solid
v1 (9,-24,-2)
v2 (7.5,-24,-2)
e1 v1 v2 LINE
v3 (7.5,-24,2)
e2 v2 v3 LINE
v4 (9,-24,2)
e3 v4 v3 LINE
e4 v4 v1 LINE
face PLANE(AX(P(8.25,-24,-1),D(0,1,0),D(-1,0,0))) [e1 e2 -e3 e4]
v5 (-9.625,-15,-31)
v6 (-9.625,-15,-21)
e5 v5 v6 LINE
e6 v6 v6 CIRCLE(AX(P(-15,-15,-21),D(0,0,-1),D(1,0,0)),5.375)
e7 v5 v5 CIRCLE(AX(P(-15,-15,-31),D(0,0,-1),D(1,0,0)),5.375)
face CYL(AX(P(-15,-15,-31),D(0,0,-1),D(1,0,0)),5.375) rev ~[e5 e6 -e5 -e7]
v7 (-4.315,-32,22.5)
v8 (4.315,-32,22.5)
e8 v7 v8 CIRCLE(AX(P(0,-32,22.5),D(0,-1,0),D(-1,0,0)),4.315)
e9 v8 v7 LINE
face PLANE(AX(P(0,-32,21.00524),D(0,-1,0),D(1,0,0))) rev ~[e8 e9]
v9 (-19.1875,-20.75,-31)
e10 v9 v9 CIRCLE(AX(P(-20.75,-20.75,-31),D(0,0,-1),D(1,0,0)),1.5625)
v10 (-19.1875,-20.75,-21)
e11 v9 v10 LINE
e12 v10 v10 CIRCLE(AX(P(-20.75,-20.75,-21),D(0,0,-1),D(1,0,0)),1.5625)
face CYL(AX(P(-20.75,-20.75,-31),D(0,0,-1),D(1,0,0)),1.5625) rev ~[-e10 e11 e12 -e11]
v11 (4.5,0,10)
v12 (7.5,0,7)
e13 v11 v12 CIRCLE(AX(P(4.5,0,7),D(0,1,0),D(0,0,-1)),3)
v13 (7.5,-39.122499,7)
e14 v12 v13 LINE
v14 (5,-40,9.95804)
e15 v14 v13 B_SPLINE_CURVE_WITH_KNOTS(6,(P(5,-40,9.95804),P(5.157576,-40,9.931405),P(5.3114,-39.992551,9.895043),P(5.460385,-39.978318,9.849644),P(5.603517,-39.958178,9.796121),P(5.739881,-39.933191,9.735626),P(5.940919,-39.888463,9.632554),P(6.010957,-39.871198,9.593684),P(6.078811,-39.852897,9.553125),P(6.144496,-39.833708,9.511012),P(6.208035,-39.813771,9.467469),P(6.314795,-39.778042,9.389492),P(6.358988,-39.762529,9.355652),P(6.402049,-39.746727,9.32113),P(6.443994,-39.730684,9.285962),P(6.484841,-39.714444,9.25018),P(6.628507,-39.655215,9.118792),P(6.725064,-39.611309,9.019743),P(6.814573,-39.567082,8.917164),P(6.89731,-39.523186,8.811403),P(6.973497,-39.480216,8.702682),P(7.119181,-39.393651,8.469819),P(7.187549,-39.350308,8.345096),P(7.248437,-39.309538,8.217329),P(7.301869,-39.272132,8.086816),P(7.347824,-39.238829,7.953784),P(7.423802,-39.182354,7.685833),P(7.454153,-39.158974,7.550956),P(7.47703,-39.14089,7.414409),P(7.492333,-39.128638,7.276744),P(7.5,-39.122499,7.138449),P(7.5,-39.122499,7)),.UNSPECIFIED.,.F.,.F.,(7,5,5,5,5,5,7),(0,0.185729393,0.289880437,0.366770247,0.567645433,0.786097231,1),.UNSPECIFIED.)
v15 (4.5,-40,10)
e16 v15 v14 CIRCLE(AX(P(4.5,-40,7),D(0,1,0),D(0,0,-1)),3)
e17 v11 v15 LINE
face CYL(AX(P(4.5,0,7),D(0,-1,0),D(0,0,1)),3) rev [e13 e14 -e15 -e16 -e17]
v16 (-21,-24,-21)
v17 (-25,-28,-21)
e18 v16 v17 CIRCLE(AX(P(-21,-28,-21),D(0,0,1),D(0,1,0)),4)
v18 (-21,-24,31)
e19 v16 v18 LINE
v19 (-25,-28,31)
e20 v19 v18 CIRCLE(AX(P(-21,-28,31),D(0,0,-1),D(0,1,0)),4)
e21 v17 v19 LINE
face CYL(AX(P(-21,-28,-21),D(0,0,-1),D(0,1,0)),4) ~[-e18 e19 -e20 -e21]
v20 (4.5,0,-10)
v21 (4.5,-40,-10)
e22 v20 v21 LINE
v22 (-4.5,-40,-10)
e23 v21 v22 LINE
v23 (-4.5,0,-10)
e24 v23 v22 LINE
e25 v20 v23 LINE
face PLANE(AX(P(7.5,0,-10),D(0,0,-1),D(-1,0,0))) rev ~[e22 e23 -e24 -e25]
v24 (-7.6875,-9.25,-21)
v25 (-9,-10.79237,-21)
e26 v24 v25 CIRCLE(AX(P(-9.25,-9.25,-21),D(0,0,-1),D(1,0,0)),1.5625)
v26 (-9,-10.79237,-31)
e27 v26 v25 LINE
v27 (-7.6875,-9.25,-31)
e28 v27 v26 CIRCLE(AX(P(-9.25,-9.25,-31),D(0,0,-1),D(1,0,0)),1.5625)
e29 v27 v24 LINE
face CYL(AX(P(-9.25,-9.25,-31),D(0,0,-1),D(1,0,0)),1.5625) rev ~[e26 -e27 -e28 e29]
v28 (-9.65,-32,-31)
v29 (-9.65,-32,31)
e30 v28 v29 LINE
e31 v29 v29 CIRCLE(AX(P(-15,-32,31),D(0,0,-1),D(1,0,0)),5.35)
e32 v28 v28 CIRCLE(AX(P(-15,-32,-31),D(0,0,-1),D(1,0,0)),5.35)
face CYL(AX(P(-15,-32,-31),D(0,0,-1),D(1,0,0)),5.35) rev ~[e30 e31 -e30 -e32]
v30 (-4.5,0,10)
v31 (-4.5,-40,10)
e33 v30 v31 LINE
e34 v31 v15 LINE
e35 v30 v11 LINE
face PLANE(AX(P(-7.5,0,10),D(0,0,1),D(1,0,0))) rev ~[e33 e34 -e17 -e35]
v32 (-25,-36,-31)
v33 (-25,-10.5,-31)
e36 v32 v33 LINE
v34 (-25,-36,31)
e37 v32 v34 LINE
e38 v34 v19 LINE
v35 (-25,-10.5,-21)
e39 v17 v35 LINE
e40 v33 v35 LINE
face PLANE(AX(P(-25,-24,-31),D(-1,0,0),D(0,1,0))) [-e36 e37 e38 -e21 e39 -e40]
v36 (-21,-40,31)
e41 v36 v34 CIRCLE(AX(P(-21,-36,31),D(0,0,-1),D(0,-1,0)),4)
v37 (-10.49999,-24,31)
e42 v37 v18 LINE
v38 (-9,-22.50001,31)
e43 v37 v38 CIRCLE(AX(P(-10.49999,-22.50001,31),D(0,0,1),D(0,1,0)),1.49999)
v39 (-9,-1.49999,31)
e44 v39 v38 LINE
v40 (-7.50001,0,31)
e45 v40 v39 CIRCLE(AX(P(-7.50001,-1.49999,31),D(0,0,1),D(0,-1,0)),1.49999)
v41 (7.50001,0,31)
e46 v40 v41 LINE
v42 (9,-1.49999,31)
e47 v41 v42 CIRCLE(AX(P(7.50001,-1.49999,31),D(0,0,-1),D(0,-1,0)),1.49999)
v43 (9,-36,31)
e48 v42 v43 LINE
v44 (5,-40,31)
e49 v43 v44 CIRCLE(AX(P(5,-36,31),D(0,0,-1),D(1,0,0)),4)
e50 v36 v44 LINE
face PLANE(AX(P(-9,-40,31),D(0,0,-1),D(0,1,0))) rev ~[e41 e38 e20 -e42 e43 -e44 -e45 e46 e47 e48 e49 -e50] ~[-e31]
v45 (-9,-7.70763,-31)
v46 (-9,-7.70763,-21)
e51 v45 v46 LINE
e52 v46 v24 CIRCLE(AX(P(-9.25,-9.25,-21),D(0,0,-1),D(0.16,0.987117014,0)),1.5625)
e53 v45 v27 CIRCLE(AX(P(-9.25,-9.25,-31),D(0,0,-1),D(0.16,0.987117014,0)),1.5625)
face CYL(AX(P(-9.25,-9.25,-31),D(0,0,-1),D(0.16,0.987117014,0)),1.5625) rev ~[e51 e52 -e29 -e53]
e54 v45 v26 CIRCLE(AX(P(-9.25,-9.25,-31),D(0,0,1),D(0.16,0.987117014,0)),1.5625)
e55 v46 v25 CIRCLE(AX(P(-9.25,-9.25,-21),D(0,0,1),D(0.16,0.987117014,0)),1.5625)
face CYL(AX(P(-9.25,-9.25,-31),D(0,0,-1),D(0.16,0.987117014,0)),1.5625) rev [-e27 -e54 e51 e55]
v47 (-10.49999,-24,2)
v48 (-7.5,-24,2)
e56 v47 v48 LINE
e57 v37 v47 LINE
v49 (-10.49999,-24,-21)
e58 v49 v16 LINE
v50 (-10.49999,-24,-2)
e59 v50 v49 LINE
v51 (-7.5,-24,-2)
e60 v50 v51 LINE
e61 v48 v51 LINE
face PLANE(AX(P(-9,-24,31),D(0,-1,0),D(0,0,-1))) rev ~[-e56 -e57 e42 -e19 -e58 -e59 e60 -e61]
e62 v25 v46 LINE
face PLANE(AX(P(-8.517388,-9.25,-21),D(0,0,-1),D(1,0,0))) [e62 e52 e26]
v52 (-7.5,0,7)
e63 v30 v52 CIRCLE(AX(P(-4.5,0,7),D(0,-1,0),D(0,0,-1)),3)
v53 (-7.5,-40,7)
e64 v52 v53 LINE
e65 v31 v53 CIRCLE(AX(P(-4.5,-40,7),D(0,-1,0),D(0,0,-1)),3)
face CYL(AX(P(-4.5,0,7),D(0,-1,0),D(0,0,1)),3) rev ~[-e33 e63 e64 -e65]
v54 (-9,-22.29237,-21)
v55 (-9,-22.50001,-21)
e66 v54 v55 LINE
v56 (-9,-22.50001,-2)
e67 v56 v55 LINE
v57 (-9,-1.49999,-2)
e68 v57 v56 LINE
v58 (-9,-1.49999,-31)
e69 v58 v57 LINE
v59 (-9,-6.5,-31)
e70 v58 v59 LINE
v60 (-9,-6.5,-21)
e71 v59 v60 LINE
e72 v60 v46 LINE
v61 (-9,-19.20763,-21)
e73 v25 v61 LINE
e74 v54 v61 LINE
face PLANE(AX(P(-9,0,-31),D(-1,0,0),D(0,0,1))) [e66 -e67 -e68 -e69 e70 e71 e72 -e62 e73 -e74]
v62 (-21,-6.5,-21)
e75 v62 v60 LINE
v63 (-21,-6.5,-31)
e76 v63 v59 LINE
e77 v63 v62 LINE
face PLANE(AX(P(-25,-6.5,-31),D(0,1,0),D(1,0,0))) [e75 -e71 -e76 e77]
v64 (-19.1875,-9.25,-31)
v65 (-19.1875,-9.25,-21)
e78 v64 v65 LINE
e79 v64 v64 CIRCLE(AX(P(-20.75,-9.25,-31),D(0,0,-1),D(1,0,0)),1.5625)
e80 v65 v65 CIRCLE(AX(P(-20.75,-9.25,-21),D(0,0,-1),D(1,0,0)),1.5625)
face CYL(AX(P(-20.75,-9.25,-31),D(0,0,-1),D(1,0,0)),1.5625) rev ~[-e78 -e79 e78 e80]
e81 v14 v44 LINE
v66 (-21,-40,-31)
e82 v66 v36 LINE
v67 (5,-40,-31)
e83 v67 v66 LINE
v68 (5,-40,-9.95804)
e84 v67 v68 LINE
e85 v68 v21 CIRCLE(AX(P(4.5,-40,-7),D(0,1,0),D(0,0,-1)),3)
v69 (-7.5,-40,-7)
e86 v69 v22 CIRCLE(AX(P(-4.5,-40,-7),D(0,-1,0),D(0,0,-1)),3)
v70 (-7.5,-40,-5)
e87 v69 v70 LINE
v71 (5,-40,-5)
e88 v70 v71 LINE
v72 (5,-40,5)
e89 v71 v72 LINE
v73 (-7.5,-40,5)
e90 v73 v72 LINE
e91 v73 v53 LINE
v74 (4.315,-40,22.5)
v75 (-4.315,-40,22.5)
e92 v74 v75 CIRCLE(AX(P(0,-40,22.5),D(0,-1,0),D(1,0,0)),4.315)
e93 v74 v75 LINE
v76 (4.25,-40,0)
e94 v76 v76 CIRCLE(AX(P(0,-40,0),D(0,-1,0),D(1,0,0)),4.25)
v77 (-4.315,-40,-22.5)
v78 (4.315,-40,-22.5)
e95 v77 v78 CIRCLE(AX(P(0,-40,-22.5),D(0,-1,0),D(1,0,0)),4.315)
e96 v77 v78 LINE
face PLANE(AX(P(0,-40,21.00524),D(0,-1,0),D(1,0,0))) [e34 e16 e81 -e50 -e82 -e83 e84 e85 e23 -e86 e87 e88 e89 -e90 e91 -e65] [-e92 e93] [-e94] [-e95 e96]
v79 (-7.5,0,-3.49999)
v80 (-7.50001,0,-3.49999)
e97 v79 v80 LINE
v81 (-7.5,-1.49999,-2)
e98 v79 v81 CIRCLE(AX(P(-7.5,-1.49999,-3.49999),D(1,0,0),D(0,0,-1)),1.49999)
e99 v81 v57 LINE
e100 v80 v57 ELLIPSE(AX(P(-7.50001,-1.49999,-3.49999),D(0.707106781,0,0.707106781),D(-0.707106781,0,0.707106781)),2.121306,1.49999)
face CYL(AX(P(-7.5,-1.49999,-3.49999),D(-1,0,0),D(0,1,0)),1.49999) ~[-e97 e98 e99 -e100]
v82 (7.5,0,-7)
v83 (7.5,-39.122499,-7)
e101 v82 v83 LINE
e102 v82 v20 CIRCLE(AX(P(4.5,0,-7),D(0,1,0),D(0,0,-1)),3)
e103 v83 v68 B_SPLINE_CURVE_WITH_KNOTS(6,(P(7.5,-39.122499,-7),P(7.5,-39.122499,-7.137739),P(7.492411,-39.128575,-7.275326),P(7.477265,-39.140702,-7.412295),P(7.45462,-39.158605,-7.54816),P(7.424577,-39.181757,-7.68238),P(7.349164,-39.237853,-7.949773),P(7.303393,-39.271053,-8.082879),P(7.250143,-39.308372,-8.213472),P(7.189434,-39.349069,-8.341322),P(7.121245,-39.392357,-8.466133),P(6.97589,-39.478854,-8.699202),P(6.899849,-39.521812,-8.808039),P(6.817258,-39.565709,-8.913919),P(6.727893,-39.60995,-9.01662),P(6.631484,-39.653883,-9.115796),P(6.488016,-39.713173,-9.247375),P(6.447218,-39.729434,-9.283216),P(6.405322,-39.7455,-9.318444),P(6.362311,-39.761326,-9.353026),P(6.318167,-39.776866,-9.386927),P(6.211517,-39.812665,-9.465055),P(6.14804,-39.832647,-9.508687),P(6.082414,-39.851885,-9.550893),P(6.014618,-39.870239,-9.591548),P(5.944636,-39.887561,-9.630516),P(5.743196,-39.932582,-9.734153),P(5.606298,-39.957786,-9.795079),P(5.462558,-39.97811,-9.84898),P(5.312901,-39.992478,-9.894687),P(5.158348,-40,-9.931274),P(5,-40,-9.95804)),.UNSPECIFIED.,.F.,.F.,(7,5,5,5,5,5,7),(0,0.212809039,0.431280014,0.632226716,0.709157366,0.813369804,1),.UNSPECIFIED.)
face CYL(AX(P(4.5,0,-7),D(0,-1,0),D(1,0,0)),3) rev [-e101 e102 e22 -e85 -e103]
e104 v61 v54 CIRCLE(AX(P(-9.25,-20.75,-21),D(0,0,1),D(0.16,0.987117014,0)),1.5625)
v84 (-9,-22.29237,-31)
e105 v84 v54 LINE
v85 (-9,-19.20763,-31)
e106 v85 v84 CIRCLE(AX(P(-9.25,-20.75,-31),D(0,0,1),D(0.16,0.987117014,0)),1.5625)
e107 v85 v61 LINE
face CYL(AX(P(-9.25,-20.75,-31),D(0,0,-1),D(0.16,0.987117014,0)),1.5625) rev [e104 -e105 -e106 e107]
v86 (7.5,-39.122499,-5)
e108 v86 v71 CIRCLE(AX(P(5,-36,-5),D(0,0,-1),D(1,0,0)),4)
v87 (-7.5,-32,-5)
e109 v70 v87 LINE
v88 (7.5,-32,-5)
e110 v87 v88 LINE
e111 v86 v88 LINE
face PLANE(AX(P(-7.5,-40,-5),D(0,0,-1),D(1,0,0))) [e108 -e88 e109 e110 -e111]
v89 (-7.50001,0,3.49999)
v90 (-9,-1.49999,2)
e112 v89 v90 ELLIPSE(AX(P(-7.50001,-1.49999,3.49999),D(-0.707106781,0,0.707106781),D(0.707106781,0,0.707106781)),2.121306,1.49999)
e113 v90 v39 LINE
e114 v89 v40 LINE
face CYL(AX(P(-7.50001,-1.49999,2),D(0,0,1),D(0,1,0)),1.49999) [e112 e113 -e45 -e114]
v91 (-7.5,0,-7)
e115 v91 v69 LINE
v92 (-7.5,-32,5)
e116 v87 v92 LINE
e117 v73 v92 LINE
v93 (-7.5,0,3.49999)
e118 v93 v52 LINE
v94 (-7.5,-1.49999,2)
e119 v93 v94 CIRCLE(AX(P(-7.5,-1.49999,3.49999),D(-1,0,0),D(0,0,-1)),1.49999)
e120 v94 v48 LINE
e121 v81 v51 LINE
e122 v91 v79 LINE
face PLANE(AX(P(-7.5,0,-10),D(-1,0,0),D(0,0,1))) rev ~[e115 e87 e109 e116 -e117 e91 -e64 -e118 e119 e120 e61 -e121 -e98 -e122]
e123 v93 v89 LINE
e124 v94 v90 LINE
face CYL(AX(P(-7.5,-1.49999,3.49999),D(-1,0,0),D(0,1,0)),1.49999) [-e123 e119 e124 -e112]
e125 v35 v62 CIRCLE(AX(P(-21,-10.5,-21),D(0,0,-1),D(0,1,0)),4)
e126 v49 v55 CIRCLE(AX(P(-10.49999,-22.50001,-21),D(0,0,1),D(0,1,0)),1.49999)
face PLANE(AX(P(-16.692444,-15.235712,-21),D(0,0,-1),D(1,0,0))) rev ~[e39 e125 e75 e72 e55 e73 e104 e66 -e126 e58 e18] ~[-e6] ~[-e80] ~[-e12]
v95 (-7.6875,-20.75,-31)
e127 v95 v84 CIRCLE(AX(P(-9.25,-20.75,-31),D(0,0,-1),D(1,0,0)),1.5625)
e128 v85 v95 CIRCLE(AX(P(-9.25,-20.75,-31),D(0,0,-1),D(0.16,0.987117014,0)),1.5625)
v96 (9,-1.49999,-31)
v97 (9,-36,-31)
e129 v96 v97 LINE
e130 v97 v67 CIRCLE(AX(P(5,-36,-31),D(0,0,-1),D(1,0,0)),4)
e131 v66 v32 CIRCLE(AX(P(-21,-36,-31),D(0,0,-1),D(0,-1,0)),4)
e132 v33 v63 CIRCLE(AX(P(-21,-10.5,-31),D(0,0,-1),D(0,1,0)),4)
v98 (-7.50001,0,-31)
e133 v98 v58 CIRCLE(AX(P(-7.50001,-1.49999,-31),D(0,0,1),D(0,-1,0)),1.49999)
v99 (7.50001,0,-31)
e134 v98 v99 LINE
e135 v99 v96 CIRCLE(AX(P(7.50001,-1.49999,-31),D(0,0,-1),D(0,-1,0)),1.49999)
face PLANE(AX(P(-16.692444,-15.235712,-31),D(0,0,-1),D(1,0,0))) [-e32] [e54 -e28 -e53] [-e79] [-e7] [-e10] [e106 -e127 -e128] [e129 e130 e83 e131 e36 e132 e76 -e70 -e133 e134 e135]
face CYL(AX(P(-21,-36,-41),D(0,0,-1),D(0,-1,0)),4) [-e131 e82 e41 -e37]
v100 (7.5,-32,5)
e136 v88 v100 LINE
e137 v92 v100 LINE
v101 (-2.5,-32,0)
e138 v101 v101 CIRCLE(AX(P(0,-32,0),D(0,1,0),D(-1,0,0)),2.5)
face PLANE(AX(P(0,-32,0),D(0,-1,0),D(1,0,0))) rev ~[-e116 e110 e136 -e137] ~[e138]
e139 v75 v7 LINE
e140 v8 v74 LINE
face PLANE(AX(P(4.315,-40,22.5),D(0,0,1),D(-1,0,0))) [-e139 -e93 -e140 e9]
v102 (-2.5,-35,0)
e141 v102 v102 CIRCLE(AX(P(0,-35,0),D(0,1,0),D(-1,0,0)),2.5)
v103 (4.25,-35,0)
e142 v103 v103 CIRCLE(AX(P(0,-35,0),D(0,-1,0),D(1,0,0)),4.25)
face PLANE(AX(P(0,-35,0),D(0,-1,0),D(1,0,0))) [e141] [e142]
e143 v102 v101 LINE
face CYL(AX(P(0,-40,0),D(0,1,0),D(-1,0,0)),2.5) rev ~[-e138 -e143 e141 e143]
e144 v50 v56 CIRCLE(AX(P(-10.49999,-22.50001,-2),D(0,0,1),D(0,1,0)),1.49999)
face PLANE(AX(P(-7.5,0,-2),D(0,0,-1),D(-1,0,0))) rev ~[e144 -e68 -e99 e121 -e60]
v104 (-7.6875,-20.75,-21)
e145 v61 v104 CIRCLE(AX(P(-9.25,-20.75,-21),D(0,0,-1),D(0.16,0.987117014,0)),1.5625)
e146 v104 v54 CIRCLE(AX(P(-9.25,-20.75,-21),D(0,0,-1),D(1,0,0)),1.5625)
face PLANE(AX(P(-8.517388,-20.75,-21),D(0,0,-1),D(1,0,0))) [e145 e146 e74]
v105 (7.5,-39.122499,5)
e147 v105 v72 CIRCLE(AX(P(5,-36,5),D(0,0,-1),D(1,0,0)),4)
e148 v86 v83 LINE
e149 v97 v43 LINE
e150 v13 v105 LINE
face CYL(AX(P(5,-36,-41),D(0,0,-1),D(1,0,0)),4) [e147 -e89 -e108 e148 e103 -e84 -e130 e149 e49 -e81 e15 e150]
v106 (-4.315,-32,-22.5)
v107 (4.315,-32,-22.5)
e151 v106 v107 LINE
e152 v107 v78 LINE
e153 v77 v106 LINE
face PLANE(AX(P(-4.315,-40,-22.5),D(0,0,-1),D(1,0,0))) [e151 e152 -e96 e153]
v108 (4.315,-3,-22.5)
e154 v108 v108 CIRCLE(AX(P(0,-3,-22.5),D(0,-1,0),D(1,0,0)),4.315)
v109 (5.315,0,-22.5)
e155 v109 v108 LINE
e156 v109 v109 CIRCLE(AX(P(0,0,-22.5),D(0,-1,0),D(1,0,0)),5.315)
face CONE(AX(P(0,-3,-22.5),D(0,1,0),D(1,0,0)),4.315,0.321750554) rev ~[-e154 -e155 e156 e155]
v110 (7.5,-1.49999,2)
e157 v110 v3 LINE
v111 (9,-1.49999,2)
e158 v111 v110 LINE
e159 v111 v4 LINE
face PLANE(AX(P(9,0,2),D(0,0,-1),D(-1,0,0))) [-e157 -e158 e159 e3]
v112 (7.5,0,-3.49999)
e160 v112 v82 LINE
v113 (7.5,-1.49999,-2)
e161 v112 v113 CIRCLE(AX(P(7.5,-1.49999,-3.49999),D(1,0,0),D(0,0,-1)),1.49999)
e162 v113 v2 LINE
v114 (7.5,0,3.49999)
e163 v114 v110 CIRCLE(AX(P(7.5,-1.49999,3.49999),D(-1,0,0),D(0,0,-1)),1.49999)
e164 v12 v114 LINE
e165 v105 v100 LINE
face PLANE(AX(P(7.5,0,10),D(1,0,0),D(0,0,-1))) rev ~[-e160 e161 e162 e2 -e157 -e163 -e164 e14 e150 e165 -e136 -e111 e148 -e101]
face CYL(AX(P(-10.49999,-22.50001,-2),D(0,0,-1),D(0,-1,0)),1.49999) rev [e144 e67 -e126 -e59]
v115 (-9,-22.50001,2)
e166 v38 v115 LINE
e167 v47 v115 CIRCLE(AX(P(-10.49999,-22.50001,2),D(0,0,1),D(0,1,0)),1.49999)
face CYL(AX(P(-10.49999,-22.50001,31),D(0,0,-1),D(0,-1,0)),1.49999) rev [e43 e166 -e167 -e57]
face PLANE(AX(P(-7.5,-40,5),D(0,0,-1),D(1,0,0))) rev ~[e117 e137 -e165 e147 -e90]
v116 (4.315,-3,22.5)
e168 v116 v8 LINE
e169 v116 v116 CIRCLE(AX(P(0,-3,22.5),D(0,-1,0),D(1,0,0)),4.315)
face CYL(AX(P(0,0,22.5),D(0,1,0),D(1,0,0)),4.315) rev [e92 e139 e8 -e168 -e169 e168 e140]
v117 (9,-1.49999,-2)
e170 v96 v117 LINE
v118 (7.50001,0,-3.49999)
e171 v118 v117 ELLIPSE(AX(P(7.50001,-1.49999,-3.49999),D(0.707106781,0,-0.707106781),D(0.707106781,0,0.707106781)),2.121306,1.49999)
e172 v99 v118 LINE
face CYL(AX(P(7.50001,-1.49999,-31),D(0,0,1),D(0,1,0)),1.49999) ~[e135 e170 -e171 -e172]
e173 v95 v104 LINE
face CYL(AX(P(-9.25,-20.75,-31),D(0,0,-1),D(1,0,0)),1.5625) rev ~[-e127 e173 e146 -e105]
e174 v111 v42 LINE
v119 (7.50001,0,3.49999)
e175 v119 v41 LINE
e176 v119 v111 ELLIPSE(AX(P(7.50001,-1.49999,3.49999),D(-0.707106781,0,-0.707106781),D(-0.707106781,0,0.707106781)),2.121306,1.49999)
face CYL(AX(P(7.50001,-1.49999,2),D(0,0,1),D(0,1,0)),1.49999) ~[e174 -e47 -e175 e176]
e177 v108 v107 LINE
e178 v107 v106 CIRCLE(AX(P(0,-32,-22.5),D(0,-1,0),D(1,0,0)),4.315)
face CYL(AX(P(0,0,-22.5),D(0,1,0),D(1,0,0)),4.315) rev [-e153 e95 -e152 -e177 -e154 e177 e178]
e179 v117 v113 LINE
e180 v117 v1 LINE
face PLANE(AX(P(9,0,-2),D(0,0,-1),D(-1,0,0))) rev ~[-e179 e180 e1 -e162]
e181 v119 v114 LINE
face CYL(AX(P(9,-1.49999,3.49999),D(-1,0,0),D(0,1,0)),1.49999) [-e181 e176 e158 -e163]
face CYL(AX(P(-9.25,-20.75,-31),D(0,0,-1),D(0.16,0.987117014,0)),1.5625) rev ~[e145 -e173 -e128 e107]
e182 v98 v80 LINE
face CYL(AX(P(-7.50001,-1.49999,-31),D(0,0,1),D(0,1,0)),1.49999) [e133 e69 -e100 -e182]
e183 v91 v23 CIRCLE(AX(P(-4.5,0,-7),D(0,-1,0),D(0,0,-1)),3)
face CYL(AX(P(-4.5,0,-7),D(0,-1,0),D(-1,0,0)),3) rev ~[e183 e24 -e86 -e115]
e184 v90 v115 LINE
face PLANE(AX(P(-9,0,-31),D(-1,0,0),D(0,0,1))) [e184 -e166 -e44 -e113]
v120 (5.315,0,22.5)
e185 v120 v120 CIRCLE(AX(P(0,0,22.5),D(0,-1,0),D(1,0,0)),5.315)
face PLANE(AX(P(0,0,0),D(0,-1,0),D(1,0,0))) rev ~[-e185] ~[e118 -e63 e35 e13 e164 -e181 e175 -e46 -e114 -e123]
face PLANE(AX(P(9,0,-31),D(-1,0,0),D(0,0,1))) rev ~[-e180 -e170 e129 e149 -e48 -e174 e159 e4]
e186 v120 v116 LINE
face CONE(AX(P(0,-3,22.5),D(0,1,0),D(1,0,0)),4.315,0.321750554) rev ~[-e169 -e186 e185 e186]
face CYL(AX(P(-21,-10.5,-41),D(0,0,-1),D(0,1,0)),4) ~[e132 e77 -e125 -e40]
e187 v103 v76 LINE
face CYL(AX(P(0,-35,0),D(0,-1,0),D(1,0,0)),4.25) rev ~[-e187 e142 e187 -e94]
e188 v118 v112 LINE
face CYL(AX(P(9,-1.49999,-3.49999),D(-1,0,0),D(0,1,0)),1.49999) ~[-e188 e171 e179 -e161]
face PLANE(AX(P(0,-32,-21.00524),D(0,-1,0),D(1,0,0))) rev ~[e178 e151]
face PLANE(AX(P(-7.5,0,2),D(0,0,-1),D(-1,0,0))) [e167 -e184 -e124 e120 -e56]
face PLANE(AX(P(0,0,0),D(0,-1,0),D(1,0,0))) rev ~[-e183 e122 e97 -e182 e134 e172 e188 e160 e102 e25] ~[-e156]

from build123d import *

# Parameters (mm, degrees)
F0_W            = 18
F0_H            = 62
F0_R            = 4.315
F1_DEPTH        = 40
F3_DEPTH        = 16
F4_R            = 5.35
F5_DEPTH        = 100
F6_R            = 1.5625
F6_R_2          = 5.375
F7_DEPTH        = 10
F8_DEPTH        = 10
F10_DEPTH       = 100
F9_W            = 1.5
F9_H            = 2
F11_DEPTH       = 24
F12_W           = 15
F12_H           = 10
F13_DEPTH       = 8
F14_SIZE2       = 3
F14_SIZE        = 1
F14_2_SIZE2     = 3
F14_2_SIZE      = 1
F15_R           = 3
F16_T1_DEPTH    = 62
F16_T3_DEPTH    = 82
F16_T5_DEPTH    = 30
F17_R           = 1.49999
F18_D           = 5
F18_DEPTH       = 10
F18_CBORE_D     = 8.5
F18_CBORE_DEPTH = 5
F18_TIP         = 1.5021515476


# Not quite as in the source:
# - a fillet or chamfer that OpenCascade refuses, or shapes differently, is made with other operations: its cross-section is extruded or revolved along the edge and cut away or added
# - a fillet or chamfer is up to 0.001 mm smaller than in the source, because OpenCascade refuses the exact size


with BuildPart() as f1:
    # F0 (on Front) → F1 (new body)
    with BuildSketch(Plane.XZ):
        Rectangle(F0_W, F0_H)
        with Locations((0, -22.5)):
            Circle(F0_R, mode=Mode.SUBTRACT)
        with Locations((0, 22.5)):
            Circle(F0_R, mode=Mode.SUBTRACT)
    extrude(amount=F1_DEPTH)

    # F2 (on face) → F3 (join)
    with BuildSketch(Plane(origin=(-9, 0, 0), x_dir=(0, -1, 0), z_dir=(-1, 0, 0))):
        Polygon((24, 31), (24, 0), (24, -31), (40, -31), (40, 31), align=None)
    extrude(amount=F3_DEPTH)

    # F4 (on face) → F5 (cut)
    with BuildSketch(Plane(origin=(0, 0, -31), x_dir=(1, 0, 0), z_dir=(0, 0, -1))):
        with Locations((-15, 32)):
            Circle(F4_R)
    extrude(amount=-F5_DEPTH, mode=Mode.SUBTRACT)

    # F6 (on face) → F7 (join)
    with BuildSketch(Plane(origin=(0, 0, -31), x_dir=(1, 0, 0), z_dir=(0, 0, -1))):
        with BuildLine():
            Line((-9, 22.2923703349), (-9, 24))
            Line((-9, 24), (-25, 24))
            Line((-25, 24), (-25, 6.5))
            Line((-25, 6.5), (-9, 6.5))
            Line((-9, 6.5), (-9, 7.7076296651))
            ThreePointArc((-9, 7.7076296651), (-10.8125, 9.25), (-9, 10.7923703349))
            Line((-9, 10.7923703349), (-9, 19.2076296651))
            ThreePointArc((-9, 19.2076296651), (-10.8125, 20.75), (-9, 22.2923703349))
        make_face()
        with Locations((-20.75, 9.25)):
            Circle(F6_R, mode=Mode.SUBTRACT)
        with Locations((-15, 15)):
            Circle(F6_R_2, mode=Mode.SUBTRACT)
        with Locations((-20.75, 20.75)):
            Circle(F6_R, mode=Mode.SUBTRACT)
    extrude(amount=-F7_DEPTH)

    # F6 (on face) → F8 (cut)
    with BuildSketch(Plane(origin=(0, 0, -31), x_dir=(1, 0, 0), z_dir=(0, 0, -1))):
        with BuildLine():
            ThreePointArc((-7.6875, 20.75), (-8.0600354522, 21.7626157341), (-9, 22.2923703349))
            Line((-9, 22.2923703349), (-9, 19.2076296651))
            ThreePointArc((-9, 19.2076296651), (-8.0600354522, 19.7373842659), (-7.6875, 20.75))
        make_face()
        with BuildLine():
            ThreePointArc((-7.6875, 9.25), (-8.0600354522, 10.2626157341), (-9, 10.7923703349))
            Line((-9, 10.7923703349), (-9, 7.7076296651))
            ThreePointArc((-9, 7.7076296651), (-8.0600354522, 8.2373842659), (-7.6875, 9.25))
        make_face()
    extrude(amount=-F8_DEPTH, mode=Mode.SUBTRACT)

    # F9 (on face) → F10 (cut)
    with BuildSketch(Plane(origin=(0, 0, 0), x_dir=(-1, 0, 0), z_dir=(0, 1, 0))):
        Polygon((7.5, 2), (7.5, 10), (-7.5, 10), (-7.5, 2), (-7.5, 0), (0, 0), (7.5, 0), align=None)
        Polygon((7.5, -2), (7.5, 0), (0, 0), (-7.5, 0), (-7.5, -2), (-7.5, -10), (7.5, -10), align=None)
    extrude(amount=-F10_DEPTH, mode=Mode.SUBTRACT)

    # F9 (on face) → F11 (cut)
    with BuildSketch(Plane(origin=(0, 0, 0), x_dir=(-1, 0, 0), z_dir=(0, 1, 0))):
        with Locations((-8.25, -1)):
            Rectangle(F9_W, F9_H)
        with Locations((-8.25, 1)):
            Rectangle(F9_W, F9_H)
        with Locations((8.25, -1)):
            Rectangle(F9_W, F9_H)
        with Locations((8.25, 1)):
            Rectangle(F9_W, F9_H)
    extrude(amount=-F11_DEPTH, mode=Mode.SUBTRACT)

    # F12 (on face) → F13 (join)
    with BuildSketch(Plane.XZ.offset(40)):
        Rectangle(F12_W, F12_H)
        with BuildLine():
            Line((4.315, 22.5), (0, 22.5))
            Line((0, 22.5), (-4.315, 22.5))
            ThreePointArc((-4.315, 22.5), (0, 18.185), (4.315, 22.5))
        make_face()
        with BuildLine():
            Line((-4.315, -22.5), (0, -22.5))
            Line((0, -22.5), (4.315, -22.5))
            ThreePointArc((4.315, -22.5), (0, -18.185), (-4.315, -22.5))
        make_face()
    extrude(amount=-F13_DEPTH)

    # F14
    f14_edges = [f1.edges().sort_by_distance(p)[0] for p in [
        (-4.315, 0, 22.5),
    ]]
    f14_side = f1.faces().sort_by_distance((8.25, 0, 2.341321))[0]
    chamfer(f14_edges, length=F14_SIZE, length2=F14_SIZE2, reference=f14_side)

    # F14#2
    f14_2_edges = [f1.edges().sort_by_distance(p)[0] for p in [
        (-4.315, 0, -22.5),
    ]]
    f14_2_side = f1.faces().sort_by_distance((0, 0, -30.658679))[0]
    chamfer(f14_2_edges, length=F14_2_SIZE, length2=F14_2_SIZE2, reference=f14_2_side)

    # F15
    f15_edges = [f1.edges().sort_by_distance(p)[0] for p in [
        (-7.5, -20, 10),
        (7.5, -20, 10),
        (7.5, -20, -10),
        (-7.5, -20, -10),
    ]]
    fillet(f15_edges, radius=F15_R)

    # F16: fillet of radius 4 on 4 edges, made by hand

    # F16_s2 → F16_t1 (cut)
    with BuildSketch(Plane.XY.offset(-21)):
        with BuildLine():
            ThreePointArc((-21, -24), (-23.8284271247, -25.1715728753), (-25, -28))
            Line((-25, -28), (-25, -24))
            Line((-25, -24), (-21, -24))
        make_face()
    extrude(amount=F16_T1_DEPTH, mode=Mode.SUBTRACT)

    # F16_s4 → F16_t3 (cut)
    with BuildSketch(Plane.XY.offset(-41)):
        with BuildLine():
            ThreePointArc((-21, -40), (-23.8284271247, -38.8284271247), (-25, -36))
            Line((-25, -36), (-25, -40))
            Line((-25, -40), (-21, -40))
        make_face()
        with BuildLine():
            ThreePointArc((9, -36), (7.8284271247, -38.8284271247), (5, -40))
            Line((5, -40), (9, -40))
            Line((9, -40), (9, -36))
        make_face()
    extrude(amount=F16_T3_DEPTH, mode=Mode.SUBTRACT)

    # F16_s6 → F16_t5 (cut)
    with BuildSketch(Plane.XY.offset(-41)):
        with BuildLine():
            ThreePointArc((-21, -6.5), (-23.8284271247, -7.6715728753), (-25, -10.5))
            Line((-25, -10.5), (-25, -6.5))
            Line((-25, -6.5), (-21, -6.5))
        make_face()
    extrude(amount=F16_T5_DEPTH, mode=Mode.SUBTRACT)

    # F17 (radius 1.5 in the source; OpenCascade refuses exactly that, so slightly less here)
    f17_edges = [f1.edges().sort_by_distance(p)[0] for p in [
        (-25, -10.5, -26),
        (-9, 0, -16.5),
        (9, 0, -16.5),
        (-9, -24, -11.5),
        (-9, -24, 16.5),
        (9, 0, 16.5),
        (-9, 0, 16.5),
        (-8.25, 0, 2),
        (-8.25, 0, -2),
        (8.25, 0, -2),
        (8.25, 0, 2),
    ]]
    fillet(f17_edges, radius=F17_R)

    # F18
    with Locations(Plane.XZ.offset(40)):
        with Locations((0, 0)):
            CounterBoreHole(F18_D / 2, F18_CBORE_D / 2, F18_CBORE_DEPTH, depth=F18_DEPTH)
            with Locations((0, 0, -(F18_DEPTH + F18_TIP / 2))):  # 118° drill point
                Cone(0, F18_D / 2, F18_TIP, mode=Mode.SUBTRACT)


solid = f1.part
